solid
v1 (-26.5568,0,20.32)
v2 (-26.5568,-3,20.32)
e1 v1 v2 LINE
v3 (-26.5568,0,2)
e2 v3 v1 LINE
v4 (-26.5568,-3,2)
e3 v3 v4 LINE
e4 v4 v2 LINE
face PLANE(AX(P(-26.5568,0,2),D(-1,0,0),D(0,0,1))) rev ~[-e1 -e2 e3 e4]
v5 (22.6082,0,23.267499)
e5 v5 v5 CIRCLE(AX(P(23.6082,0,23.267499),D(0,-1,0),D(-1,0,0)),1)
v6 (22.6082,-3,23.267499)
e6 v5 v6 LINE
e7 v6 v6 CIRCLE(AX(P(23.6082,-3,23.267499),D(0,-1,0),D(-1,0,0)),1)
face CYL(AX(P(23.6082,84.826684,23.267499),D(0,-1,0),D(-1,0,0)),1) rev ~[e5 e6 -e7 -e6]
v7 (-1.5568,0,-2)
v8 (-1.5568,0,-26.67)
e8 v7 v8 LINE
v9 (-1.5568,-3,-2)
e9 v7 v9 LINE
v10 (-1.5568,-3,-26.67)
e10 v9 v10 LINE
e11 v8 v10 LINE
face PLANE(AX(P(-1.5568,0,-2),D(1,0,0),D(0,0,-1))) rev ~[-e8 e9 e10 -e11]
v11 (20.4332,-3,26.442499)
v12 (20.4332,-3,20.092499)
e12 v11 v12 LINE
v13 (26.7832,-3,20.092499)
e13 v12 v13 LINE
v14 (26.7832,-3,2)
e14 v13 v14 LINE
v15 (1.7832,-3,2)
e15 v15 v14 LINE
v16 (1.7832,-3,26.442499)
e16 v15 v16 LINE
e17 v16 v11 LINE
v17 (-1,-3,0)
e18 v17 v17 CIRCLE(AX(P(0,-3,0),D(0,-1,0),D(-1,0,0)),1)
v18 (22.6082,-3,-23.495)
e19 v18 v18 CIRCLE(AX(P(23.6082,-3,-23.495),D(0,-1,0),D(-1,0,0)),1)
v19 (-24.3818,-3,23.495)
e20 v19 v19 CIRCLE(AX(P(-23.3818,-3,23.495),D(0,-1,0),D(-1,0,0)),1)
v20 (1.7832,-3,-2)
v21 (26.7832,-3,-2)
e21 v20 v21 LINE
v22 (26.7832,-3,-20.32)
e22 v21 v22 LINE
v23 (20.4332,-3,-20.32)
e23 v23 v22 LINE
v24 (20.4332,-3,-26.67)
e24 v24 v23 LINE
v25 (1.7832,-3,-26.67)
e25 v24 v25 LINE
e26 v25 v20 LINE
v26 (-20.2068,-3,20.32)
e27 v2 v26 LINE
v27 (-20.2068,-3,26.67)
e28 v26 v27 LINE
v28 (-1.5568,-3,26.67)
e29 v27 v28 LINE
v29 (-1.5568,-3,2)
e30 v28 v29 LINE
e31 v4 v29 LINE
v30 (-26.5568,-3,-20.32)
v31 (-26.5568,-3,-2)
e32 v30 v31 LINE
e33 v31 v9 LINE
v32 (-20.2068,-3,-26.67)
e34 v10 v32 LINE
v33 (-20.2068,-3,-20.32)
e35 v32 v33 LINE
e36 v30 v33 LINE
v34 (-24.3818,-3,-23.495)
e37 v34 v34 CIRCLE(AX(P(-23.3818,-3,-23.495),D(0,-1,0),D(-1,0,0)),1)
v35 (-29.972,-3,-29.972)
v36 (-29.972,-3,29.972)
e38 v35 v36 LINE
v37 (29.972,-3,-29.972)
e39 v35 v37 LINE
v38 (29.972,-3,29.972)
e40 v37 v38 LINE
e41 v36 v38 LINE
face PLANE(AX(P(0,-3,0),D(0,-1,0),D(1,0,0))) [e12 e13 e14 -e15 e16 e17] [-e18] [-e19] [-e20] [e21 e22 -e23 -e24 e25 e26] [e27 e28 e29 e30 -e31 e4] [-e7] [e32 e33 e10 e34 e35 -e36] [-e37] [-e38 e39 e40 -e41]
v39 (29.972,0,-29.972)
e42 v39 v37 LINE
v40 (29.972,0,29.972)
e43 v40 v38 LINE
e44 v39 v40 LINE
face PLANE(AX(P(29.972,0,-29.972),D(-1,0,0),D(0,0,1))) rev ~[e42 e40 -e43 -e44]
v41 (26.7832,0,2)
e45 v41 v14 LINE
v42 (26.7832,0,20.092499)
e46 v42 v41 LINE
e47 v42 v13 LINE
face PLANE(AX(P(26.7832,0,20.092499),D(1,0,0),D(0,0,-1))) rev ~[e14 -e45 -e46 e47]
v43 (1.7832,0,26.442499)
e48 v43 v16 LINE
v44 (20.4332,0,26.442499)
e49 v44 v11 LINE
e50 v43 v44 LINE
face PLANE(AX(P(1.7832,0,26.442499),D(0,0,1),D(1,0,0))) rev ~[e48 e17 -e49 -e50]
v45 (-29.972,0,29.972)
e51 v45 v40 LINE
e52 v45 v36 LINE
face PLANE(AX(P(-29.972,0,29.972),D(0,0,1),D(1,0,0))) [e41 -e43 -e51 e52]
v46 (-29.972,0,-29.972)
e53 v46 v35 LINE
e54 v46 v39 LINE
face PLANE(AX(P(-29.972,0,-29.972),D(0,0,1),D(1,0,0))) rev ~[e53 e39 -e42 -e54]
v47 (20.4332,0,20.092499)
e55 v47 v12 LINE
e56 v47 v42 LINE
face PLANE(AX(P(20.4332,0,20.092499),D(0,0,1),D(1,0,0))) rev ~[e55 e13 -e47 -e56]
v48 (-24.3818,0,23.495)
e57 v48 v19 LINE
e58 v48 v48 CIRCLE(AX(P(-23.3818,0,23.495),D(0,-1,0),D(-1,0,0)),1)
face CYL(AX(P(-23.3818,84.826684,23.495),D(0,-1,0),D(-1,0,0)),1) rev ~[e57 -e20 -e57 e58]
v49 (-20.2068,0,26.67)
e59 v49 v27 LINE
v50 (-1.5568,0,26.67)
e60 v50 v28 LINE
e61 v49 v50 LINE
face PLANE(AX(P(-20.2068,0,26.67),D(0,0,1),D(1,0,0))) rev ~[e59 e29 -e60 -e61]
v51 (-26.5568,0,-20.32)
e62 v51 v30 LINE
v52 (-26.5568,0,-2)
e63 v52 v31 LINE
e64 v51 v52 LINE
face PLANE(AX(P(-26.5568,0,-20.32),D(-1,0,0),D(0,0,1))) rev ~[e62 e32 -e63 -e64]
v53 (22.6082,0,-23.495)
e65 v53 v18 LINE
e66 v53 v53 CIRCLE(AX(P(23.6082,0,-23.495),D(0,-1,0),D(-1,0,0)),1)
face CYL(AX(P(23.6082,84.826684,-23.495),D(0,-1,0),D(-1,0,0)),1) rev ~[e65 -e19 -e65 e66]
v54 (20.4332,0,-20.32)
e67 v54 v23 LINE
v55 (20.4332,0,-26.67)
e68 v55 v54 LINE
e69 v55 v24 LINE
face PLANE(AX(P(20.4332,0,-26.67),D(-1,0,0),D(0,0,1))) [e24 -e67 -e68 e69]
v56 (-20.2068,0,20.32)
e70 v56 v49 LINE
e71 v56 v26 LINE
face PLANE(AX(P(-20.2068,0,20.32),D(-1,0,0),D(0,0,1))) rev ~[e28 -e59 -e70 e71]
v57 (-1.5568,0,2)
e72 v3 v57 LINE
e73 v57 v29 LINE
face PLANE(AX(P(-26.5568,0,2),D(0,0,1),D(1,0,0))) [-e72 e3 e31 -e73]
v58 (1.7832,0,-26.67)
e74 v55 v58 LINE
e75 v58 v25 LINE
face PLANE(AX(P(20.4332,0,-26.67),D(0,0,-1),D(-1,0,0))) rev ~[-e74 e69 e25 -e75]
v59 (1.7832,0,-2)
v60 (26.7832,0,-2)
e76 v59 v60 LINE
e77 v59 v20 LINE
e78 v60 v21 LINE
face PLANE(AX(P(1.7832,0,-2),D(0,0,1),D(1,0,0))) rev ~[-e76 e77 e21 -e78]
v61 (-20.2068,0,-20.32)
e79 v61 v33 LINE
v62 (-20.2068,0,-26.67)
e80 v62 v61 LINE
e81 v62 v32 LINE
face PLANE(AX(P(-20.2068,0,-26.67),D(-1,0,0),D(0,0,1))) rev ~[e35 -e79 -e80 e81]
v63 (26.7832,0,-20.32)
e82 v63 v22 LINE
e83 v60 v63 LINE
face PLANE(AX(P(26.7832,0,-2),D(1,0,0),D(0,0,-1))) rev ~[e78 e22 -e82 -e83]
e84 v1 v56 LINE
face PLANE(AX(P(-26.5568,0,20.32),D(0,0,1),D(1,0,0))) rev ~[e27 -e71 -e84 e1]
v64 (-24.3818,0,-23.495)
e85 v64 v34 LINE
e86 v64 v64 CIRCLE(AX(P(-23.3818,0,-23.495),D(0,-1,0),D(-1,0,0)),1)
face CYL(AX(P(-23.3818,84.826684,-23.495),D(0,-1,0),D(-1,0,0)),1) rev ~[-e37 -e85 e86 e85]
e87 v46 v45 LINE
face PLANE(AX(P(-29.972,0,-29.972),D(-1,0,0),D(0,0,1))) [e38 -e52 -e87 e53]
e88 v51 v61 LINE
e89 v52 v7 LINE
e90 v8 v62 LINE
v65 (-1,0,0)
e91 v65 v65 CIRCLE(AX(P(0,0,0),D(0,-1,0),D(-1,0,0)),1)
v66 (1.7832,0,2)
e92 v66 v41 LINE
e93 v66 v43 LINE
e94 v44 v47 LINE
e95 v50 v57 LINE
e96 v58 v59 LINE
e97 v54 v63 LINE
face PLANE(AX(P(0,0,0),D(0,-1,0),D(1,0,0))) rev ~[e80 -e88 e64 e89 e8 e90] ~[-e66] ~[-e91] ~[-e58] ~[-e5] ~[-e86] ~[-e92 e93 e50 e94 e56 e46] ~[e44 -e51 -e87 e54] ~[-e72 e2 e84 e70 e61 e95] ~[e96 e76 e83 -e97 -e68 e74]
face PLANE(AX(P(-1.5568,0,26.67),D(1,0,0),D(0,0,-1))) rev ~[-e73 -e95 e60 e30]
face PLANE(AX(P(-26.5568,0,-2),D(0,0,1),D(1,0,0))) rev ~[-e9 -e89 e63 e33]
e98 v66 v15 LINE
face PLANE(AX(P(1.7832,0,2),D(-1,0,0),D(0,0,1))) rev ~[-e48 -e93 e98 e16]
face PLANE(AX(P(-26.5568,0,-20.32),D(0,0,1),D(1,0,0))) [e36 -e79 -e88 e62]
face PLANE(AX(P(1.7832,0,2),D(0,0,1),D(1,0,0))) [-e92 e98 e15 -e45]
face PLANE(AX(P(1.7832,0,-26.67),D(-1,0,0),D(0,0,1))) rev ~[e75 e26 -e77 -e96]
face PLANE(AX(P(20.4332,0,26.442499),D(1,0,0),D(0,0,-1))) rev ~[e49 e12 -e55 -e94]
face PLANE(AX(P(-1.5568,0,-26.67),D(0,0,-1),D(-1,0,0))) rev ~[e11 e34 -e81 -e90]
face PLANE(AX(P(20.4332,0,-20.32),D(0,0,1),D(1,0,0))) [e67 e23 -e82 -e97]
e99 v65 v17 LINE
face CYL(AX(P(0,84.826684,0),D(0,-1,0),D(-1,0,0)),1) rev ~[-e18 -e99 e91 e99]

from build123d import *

# Parameters (mm, degrees)
F0_W     = 59.944
F0_H     = 59.944
F0_W_2   = 25
F0_H_2   = 2
F0_W_3   = 6.35
F0_H_3   = 6.35
F1_DEPTH = 3
F2_D     = 2


# Not quite as in the source:
# - a feature names something its author has since deleted; it is built from what else it names


with BuildPart() as f1:
    # F0 (on Front) → F1 (new body)
    with BuildSketch(Plane.XZ):
        Rectangle(F0_W, F0_H)
        Polygon((-26.5568002729, 26.67), (-20.2068002729, 26.67), (-1.5568002729, 26.67), (-1.5568002729, 20.32), (-1.5568002729, 2), (-1.5568002729, 0), (-1.5568002729, -2), (-1.5568002729, -20.32), (-1.5568002729, -26.67), (-20.2068002729, -26.67), (-26.5568002729, -26.67), (-26.5568002729, -20.32), (-26.5568002729, -2), (-26.5568002729, 0), (-26.5568002729, 2), (-26.5568002729, 20.32), align=None, mode=Mode.SUBTRACT)
        Polygon((20.4331997271, 26.4424991059), (26.7831997271, 26.4424991059), (26.7831997271, 20.0924991059), (26.7831997271, 2), (26.7831997271, 0), (26.7831997271, -2), (26.7831997271, -20.32), (26.7831997271, -26.67), (20.4331997271, -26.67), (1.7831997271, -26.67), (1.7831997271, -20.32), (1.7831997271, -2), (1.7831997271, 0), (1.7831997271, 2), (1.7831997271, 20.0924991059), (1.7831997271, 26.4424991059), align=None, mode=Mode.SUBTRACT)
        with Locations((14.2831997271, 1)):
            Rectangle(F0_W_2, F0_H_2)
        with Locations((14.2831997271, -1)):
            Rectangle(F0_W_2, F0_H_2)
        with Locations((-14.0568002729, 1)):
            Rectangle(F0_W_2, F0_H_2)
        with Locations((-14.0568002729, -1)):
            Rectangle(F0_W_2, F0_H_2)
        Polygon((-20.2068002729, 26.4424991059), (-20.2068002729, 26.67), (-26.5568002729, 26.67), (-26.5568002729, 20.32), (-20.2068002729, 20.32), align=None)
        Polygon((26.7831997271, 20.0924991059), (26.7831997271, 26.4424991059), (20.4331997271, 26.4424991059), (20.4331997271, 20.32), (20.4331997271, 20.0924991059), align=None)
        with Locations((23.6081997271, -23.495)):
            Rectangle(F0_W_3, F0_H_3)
        with Locations((-23.3818002729, -23.495)):
            Rectangle(F0_W_3, F0_H_3)
    extrude(amount=F1_DEPTH)

    # F2 (through all)
    with Locations(Plane(origin=(0, 0, 0), x_dir=(1, 0, 0), z_dir=(0, 1, 0))):
        with Locations((23.6081997271, -23.2674991059), (0, 0), (23.6081997271, 23.495), (-23.3818002729, -23.495), (-23.3818002729, 23.495)):
            Hole(F2_D / 2)


solid = f1.part
